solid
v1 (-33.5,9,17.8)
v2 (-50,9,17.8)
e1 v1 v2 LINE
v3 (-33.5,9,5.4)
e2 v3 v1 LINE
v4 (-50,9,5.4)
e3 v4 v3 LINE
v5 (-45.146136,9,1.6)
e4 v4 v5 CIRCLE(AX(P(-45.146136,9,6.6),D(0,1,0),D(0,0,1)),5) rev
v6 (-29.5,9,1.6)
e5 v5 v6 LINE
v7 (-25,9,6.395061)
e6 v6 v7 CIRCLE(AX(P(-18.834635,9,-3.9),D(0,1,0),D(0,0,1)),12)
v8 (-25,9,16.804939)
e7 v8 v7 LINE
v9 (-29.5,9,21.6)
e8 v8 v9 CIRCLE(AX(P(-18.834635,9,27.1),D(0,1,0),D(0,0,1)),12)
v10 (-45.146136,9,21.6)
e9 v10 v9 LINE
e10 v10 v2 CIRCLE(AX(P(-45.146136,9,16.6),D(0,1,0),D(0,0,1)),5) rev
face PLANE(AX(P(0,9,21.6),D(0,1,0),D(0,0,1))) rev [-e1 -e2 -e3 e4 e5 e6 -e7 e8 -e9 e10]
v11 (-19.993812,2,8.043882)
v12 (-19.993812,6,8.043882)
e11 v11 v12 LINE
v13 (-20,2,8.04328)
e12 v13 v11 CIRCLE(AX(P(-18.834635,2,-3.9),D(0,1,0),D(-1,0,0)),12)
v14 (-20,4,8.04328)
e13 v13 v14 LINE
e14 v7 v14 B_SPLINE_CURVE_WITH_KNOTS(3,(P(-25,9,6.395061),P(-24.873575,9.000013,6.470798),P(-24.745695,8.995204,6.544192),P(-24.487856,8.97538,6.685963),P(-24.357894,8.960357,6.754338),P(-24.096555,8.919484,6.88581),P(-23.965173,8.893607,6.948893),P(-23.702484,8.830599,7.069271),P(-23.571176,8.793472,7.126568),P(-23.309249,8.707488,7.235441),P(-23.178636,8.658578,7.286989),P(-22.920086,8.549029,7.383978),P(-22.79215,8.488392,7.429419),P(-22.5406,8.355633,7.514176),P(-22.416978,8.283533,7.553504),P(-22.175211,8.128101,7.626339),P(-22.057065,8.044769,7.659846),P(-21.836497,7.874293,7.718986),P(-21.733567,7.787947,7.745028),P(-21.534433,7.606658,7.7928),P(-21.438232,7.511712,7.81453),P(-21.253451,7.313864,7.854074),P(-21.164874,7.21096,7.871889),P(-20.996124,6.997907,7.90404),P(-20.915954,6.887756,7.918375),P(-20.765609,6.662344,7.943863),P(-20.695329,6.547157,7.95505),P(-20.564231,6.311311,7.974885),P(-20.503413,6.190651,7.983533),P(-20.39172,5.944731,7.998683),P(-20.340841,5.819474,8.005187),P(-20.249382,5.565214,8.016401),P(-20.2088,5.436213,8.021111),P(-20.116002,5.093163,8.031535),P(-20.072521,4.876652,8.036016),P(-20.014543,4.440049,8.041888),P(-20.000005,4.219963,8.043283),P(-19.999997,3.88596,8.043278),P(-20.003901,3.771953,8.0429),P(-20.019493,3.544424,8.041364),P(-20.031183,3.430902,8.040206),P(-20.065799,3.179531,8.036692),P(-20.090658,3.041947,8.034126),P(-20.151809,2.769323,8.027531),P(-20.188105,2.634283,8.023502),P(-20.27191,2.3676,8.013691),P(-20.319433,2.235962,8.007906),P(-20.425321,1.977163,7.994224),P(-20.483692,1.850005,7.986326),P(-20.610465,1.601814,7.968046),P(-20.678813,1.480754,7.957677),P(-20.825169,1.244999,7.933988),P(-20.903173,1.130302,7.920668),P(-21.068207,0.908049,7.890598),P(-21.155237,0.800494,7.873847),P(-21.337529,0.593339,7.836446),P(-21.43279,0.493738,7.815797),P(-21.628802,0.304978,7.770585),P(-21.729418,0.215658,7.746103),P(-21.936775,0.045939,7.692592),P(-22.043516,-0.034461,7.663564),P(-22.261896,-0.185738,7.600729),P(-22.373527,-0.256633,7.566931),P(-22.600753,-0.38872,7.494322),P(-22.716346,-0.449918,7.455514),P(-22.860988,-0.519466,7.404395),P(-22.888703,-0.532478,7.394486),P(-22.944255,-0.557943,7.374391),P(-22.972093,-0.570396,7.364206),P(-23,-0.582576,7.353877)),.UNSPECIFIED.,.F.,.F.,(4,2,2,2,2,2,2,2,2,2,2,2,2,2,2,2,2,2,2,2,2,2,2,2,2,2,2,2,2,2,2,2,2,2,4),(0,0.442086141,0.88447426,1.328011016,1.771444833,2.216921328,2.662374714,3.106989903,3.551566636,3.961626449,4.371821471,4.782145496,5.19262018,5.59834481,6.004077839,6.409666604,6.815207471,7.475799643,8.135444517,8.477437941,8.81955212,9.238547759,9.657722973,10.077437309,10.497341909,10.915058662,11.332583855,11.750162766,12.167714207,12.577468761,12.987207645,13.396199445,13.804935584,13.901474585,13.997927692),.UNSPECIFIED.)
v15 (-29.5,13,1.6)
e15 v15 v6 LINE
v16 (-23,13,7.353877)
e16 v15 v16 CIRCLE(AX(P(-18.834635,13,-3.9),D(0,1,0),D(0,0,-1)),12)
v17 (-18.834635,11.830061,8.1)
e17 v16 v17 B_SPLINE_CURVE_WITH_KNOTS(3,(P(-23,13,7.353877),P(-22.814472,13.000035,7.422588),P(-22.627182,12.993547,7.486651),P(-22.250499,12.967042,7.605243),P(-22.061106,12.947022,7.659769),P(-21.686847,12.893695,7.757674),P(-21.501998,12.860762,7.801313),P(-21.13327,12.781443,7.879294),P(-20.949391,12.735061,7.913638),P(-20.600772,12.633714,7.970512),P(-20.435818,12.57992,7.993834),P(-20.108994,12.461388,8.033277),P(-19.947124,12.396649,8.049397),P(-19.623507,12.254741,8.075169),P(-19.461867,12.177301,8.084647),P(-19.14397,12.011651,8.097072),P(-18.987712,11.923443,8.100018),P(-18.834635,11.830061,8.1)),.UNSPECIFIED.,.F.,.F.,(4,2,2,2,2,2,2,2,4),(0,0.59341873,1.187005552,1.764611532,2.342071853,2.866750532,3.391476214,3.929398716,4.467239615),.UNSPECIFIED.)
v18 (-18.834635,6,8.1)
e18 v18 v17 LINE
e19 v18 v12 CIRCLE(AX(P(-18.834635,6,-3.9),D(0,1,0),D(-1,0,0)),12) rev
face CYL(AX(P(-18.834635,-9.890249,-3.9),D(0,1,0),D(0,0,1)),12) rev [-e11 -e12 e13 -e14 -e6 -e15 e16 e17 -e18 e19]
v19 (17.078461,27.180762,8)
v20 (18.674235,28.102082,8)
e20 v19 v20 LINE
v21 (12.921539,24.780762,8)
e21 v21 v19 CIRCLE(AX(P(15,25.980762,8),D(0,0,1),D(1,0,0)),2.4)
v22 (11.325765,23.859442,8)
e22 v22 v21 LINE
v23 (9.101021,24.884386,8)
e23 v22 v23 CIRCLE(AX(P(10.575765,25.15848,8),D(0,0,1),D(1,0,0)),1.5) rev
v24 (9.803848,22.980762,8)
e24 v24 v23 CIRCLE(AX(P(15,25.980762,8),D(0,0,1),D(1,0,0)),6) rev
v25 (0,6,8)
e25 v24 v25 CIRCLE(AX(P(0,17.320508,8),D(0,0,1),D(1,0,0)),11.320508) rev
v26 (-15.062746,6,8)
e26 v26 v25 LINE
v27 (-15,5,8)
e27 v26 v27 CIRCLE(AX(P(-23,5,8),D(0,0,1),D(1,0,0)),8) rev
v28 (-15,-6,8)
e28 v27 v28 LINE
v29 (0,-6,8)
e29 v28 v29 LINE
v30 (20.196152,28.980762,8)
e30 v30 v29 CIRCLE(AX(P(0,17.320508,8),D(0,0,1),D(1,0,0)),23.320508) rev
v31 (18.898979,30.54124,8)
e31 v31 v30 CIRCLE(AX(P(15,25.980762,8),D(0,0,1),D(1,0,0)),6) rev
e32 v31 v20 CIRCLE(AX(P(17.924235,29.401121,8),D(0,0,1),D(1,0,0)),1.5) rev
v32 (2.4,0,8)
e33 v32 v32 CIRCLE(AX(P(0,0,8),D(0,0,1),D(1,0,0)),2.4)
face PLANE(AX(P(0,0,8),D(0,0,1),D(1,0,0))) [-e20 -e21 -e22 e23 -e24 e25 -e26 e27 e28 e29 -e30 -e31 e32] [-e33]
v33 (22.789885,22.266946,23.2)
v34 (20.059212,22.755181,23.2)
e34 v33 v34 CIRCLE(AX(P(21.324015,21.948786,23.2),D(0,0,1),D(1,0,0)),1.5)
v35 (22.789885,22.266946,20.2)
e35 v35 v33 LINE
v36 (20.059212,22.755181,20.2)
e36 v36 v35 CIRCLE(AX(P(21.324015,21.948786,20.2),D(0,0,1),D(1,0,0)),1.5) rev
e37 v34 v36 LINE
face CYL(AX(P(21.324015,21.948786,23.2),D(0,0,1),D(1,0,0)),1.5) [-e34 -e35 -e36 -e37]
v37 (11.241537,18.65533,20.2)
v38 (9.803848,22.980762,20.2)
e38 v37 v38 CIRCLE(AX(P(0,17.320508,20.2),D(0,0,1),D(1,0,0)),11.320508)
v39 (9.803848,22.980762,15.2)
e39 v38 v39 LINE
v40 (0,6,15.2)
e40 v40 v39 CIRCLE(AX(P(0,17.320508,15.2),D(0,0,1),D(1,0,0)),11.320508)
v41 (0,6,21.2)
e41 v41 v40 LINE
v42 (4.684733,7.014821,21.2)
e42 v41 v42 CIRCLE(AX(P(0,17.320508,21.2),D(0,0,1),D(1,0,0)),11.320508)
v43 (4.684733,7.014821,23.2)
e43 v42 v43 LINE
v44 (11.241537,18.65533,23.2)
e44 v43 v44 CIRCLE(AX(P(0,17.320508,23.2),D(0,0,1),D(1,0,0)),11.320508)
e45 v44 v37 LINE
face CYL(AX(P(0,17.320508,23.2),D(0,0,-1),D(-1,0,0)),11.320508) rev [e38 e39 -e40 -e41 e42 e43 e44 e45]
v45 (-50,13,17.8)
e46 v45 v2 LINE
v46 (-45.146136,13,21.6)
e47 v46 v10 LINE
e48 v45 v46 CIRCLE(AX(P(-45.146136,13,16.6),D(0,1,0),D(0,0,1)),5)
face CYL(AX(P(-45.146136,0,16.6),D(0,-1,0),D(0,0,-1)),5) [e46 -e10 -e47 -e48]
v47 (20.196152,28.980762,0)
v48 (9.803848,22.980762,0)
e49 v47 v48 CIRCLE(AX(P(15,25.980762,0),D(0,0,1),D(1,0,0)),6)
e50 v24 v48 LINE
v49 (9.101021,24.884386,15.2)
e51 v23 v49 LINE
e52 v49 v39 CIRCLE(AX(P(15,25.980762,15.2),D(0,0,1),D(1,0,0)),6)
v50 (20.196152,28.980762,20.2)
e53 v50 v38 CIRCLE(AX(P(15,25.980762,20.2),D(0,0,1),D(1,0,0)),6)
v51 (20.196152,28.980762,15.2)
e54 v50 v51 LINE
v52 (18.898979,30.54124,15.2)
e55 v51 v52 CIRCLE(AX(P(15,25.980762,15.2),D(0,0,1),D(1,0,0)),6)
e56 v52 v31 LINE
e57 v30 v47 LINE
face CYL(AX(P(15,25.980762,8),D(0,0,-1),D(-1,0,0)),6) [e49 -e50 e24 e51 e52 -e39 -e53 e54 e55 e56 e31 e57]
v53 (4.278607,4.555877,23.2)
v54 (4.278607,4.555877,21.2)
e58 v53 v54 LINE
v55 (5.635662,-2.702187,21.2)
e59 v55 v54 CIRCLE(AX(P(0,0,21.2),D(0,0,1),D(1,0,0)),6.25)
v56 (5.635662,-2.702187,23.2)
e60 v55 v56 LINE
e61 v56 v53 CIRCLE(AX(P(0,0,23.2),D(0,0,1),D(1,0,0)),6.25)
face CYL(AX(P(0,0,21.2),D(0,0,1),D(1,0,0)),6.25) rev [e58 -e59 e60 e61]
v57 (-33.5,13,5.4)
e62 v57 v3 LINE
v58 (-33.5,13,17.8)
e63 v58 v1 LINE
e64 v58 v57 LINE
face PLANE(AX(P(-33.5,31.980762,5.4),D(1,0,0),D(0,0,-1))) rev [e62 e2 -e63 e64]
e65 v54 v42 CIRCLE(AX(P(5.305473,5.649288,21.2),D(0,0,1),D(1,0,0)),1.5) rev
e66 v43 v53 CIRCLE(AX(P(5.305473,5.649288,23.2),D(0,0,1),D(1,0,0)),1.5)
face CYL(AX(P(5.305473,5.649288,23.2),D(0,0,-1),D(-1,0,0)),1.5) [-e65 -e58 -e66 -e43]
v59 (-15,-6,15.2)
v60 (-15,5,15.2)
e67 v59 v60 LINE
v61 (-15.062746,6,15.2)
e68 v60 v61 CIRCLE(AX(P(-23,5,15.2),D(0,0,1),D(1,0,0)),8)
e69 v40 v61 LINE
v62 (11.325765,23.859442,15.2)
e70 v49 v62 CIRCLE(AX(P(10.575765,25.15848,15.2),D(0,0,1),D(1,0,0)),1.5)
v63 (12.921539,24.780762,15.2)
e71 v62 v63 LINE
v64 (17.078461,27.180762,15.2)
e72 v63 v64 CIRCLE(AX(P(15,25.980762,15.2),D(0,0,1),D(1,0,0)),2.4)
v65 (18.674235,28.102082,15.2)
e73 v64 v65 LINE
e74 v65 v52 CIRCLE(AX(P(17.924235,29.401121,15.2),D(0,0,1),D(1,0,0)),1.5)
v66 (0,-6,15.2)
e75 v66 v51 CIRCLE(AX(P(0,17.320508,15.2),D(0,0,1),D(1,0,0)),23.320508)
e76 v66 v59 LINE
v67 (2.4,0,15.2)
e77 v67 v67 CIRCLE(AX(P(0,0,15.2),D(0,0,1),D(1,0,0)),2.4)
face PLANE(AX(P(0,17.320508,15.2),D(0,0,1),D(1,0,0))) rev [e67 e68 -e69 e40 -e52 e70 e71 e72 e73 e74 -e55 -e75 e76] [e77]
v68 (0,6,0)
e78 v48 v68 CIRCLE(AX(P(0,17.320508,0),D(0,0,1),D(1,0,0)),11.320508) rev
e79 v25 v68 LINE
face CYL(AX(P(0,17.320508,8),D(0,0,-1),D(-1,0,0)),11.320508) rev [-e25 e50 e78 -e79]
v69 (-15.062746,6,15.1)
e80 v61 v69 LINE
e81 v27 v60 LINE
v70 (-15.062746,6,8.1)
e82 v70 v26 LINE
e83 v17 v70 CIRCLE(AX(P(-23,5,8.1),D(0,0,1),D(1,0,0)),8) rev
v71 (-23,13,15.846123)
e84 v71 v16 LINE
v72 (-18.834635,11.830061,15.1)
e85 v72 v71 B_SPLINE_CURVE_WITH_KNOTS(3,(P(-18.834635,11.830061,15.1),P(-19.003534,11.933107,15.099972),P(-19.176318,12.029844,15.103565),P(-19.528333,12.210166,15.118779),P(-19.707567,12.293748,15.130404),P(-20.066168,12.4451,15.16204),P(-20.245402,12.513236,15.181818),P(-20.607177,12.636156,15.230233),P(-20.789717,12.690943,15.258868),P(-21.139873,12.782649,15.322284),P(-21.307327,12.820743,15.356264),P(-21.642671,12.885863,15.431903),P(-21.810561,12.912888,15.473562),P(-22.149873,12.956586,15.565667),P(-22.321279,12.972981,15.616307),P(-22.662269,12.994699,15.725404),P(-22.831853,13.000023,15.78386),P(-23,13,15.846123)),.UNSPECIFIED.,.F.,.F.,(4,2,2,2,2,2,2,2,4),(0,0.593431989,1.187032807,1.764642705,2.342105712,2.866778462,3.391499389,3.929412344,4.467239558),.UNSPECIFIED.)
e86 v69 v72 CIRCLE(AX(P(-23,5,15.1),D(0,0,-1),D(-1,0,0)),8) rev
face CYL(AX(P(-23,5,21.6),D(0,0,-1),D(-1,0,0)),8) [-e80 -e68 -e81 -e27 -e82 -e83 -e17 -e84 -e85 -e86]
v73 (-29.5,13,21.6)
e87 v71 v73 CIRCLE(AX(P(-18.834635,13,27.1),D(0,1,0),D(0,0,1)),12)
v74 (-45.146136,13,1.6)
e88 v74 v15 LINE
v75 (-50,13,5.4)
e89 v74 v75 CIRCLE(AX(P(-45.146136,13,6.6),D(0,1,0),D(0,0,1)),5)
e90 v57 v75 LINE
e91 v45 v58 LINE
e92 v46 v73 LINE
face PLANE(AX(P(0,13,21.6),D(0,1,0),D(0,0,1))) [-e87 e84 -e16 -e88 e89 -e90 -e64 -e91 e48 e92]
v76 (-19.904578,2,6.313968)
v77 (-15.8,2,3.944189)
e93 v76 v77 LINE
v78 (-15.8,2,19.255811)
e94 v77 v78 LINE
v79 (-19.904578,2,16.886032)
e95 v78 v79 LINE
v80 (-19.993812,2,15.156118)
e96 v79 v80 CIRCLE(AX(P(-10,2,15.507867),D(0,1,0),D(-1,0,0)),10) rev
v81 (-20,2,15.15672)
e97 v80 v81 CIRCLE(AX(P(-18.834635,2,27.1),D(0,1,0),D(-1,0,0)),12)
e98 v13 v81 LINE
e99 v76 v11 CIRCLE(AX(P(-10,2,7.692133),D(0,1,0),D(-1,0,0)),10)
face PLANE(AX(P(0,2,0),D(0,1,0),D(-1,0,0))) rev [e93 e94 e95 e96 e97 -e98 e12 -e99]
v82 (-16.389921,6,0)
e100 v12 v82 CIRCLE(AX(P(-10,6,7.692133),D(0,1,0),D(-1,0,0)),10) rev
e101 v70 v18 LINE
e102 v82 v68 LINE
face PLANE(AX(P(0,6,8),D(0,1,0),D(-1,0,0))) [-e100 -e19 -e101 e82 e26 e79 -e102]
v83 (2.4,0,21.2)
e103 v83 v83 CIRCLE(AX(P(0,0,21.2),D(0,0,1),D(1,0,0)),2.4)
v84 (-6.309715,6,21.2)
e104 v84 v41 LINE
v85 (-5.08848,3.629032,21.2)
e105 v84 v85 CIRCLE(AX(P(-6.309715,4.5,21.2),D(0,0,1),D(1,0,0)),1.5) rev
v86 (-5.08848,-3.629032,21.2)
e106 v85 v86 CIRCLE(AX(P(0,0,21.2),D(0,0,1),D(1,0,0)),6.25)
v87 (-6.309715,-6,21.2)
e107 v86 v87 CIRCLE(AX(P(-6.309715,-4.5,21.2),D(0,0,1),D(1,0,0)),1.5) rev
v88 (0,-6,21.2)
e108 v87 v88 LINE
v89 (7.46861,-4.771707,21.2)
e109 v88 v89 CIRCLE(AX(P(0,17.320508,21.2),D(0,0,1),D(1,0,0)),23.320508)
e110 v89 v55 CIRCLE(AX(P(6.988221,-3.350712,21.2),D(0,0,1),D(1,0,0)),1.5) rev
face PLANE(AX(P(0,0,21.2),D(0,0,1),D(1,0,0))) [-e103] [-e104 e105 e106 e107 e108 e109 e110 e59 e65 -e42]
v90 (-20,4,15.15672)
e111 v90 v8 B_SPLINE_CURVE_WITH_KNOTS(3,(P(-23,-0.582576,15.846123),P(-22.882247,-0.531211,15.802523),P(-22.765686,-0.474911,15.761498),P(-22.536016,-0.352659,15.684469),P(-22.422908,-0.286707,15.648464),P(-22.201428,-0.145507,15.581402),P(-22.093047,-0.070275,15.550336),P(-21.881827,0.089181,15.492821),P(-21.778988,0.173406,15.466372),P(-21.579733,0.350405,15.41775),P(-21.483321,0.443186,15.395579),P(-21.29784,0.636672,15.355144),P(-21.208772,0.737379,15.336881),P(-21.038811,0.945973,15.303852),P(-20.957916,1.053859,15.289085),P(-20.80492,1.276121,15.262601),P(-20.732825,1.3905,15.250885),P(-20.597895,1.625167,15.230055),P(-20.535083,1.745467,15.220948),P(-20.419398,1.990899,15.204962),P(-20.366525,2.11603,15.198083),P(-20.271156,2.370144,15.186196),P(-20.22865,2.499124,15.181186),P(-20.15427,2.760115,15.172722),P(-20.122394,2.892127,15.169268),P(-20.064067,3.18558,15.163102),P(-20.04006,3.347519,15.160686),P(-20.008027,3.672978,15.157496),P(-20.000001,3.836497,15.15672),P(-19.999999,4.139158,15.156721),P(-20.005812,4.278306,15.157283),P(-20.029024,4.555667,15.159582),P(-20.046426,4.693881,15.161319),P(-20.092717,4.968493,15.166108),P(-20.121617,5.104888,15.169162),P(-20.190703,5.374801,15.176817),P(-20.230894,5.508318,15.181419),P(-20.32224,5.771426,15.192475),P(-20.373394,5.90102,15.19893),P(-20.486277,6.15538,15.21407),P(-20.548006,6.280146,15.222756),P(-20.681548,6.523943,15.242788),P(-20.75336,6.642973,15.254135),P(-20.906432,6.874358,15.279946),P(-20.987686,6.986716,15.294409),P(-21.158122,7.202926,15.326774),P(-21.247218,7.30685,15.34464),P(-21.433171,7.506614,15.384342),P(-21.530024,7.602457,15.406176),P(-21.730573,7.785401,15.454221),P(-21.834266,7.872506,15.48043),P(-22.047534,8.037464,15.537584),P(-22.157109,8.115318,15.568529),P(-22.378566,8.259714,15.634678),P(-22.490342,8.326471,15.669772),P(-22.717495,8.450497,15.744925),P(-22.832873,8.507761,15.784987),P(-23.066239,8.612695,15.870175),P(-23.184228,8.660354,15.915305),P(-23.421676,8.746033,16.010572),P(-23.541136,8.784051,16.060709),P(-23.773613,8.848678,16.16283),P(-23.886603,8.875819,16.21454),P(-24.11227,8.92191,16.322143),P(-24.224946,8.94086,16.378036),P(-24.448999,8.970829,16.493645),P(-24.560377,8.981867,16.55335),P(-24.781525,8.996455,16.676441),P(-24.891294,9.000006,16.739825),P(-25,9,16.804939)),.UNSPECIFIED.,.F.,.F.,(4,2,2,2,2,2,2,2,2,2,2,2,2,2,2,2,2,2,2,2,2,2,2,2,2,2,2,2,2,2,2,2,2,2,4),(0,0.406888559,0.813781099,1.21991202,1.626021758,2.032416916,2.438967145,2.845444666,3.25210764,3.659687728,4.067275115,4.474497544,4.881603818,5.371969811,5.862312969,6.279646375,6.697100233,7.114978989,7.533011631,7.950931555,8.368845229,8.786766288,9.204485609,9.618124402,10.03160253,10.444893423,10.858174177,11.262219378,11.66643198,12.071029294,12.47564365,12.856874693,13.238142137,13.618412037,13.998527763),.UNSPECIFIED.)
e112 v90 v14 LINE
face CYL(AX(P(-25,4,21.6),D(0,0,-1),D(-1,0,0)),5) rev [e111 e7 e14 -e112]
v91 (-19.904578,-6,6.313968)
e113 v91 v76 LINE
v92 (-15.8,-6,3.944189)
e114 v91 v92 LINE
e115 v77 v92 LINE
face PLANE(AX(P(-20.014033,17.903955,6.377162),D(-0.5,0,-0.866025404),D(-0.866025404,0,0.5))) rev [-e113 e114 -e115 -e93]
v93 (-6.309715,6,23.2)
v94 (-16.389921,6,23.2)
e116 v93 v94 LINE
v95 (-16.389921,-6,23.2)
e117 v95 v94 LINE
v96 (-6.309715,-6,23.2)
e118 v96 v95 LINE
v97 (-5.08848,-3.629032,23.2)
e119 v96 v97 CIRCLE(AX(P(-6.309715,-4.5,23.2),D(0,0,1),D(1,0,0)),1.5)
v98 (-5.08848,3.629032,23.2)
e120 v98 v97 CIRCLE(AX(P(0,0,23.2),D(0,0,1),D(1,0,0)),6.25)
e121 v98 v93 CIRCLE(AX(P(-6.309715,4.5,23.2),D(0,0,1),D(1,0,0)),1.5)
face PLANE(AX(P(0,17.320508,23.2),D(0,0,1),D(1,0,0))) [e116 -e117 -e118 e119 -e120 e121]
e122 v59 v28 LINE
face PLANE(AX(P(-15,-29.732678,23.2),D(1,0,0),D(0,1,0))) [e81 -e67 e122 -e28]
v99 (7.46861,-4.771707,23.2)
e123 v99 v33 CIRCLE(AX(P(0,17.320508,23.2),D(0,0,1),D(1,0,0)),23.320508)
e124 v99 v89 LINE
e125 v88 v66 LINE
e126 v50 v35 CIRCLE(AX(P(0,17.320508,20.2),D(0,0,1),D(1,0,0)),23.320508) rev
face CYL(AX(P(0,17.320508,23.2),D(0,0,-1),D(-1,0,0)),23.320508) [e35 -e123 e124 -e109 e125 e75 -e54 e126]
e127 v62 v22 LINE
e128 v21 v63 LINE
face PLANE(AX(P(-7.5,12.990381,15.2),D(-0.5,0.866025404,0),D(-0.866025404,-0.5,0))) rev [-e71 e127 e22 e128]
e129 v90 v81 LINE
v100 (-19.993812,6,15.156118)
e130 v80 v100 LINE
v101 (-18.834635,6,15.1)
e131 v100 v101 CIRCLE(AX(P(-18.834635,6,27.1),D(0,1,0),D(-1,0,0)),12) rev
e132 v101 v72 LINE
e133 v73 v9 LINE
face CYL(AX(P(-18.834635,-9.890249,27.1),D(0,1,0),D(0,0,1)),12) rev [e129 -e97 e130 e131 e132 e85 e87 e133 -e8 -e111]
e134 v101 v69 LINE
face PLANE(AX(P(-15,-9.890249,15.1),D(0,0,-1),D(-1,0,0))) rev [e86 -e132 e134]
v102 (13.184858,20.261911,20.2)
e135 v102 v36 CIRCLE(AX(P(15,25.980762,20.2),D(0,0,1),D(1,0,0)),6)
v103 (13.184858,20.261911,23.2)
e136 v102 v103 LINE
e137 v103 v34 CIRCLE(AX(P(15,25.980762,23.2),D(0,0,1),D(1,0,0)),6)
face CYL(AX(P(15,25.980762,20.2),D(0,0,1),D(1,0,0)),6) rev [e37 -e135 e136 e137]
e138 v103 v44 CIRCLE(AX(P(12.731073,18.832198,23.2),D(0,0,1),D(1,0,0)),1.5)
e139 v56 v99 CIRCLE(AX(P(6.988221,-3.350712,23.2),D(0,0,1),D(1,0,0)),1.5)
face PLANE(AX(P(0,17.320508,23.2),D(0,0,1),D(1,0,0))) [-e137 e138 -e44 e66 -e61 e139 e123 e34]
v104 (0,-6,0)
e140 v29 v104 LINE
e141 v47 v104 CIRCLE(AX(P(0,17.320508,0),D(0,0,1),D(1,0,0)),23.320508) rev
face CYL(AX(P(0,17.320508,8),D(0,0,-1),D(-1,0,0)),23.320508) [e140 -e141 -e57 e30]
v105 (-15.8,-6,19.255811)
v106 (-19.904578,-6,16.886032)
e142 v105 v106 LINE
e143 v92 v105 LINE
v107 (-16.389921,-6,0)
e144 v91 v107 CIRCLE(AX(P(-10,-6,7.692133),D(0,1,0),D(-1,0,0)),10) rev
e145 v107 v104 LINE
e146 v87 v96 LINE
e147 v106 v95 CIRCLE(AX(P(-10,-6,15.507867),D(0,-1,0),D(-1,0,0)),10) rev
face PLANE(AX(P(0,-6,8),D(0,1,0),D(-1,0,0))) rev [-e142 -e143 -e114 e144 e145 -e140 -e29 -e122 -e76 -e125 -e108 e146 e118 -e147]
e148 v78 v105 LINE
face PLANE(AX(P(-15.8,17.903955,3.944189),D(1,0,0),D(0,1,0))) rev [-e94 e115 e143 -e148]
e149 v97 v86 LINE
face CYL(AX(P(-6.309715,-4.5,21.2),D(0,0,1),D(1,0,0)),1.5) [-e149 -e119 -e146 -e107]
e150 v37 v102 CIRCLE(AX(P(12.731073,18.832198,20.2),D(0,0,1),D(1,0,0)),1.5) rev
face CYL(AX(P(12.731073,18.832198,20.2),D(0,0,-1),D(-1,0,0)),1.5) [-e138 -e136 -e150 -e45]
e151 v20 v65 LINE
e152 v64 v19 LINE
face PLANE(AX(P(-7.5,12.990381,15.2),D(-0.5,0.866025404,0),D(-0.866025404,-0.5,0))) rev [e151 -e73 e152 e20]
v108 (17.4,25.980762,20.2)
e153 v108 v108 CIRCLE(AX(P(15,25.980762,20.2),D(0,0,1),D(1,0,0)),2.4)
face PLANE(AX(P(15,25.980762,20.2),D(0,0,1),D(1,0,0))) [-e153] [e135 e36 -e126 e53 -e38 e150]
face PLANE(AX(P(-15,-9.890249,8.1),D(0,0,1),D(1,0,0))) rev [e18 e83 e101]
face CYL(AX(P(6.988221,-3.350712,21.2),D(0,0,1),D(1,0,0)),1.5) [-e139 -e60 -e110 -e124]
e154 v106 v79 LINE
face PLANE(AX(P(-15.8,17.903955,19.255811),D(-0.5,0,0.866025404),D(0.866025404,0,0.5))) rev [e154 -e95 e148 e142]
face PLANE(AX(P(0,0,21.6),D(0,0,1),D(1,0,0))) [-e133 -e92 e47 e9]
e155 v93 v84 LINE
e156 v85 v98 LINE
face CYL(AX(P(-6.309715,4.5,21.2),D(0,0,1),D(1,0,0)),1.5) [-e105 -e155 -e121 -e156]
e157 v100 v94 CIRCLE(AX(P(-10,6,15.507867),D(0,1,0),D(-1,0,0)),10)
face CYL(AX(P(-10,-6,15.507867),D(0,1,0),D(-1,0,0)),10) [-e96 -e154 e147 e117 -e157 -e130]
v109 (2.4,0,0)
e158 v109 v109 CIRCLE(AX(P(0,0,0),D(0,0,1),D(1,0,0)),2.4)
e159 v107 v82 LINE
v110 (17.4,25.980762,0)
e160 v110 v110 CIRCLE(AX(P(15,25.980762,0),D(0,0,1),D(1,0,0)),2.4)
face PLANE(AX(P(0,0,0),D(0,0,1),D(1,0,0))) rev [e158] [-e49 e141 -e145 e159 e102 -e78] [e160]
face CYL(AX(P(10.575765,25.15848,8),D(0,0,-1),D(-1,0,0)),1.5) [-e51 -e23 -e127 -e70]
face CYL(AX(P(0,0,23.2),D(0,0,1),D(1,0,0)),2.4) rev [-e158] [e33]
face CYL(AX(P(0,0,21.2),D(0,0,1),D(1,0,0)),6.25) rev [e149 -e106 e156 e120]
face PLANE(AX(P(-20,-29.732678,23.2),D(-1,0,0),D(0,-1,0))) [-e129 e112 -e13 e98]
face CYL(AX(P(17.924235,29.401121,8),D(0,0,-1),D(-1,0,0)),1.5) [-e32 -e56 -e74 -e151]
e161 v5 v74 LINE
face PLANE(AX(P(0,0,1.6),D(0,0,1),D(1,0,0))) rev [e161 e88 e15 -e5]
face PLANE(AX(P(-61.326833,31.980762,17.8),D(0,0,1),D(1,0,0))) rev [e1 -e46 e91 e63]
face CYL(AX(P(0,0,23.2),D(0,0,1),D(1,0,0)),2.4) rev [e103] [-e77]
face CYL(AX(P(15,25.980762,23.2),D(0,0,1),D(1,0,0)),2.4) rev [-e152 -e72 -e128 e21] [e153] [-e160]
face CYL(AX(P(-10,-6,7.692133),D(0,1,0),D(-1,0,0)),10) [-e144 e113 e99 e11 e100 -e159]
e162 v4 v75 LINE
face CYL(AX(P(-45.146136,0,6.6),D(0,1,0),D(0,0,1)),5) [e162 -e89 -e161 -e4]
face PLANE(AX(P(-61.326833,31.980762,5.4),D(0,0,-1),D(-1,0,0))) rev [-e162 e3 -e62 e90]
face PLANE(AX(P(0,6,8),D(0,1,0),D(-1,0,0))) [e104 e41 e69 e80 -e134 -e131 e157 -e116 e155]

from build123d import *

# Parameters (mm, degrees)
BOSS_EXTRUDE1_DEPTH      = 8
BOSS_EXTRUDE2_DEPTH      = 7.2
BOSS_EXTRUDE3_START      = 15.2
SKETCH1_3_R              = 6
BOSS_EXTRUDE3_DEPTH      = 8
SKETCH3_W                = 5
SKETCH3_H                = 23.2
BOSS_EXTRUDE4_DEPTH      = 12
CUT_EXTRUDE1_START       = -3
SKETCH4_R                = 6
CUT_EXTRUDE1_DEPTH       = 3
FILLET1_START            = 20.2
FILLET1_DEPTH            = 3.8
FILLET1_START_2          = 8
FILLET1_2_DEPTH          = 7.2
SKETCH7_R                = 6.25
CUT_EXTRUDE4_DEPTH       = 2
FILLET2_R                = 1.5
M4_CLEARANCE_HOLE1_D     = 4.8
CUT_EXTRUDE5_DEPTH       = 42.917610932
CUT_EXTRUDE6_START       = -12
CUT_EXTRUDE6_DEPTH       = 8
CUT_EXTRUDE7_DEPTH       = 8
BOSS_EXTRUDE5_DEPTH      = 10
CUT_EXTRUDE9_DEPTH       = 60.718970453
CUT_EXTRUDE9_DEPTH_BACK  = 60.718970453
SKETCH17_W               = 27.826832925
SKETCH17_H               = 12.4
FILLET3_R                = 5
CUT_EXTRUDE10_REACH      = 60.303
CUT_EXTRUDE11_START      = -8
CUT_EXTRUDE11_DEPTH      = 8
FILLET6_R                = 8
CUT_EXTRUDE12_DEPTH      = 61.936360284
CUT_EXTRUDE12_DEPTH_BACK = 61.936360284


with BuildPart() as part:
    # Sketch1 → Boss-Extrude1 (new body)
    with BuildSketch(Plane.XY):
        with BuildLine():
            ThreePointArc((0, -6), (20.196152423, 5.660254038), (20.196152423, 28.980762114))
            ThreePointArc((20.196152423, 28.980762114), (12, 31.176914536), (9.803847577, 22.980762114))
            ThreePointArc((9.803847577, 22.980762114), (9.803847577, 11.660254038), (0, 6))
            Line((0, 6), (-15, 6))
            Line((-15, 6), (-15, -6))
            Line((-15, -6), (0, -6))
        make_face()
    extrude(amount=BOSS_EXTRUDE1_DEPTH)

    # Sketch2 → Boss-Extrude2 (add)
    with BuildSketch(Plane.XY.offset(8)):
        with BuildLine():
            Line((9.803847577, 22.980762114), (20.196152423, 28.980762114))
            ThreePointArc((20.196152423, 28.980762114), (12, 31.176914536), (9.803847577, 22.980762114))
        make_face()
    extrude(amount=BOSS_EXTRUDE2_DEPTH)

    # Sketch1<3> → Boss-Extrude3 (add)
    with BuildSketch(Plane.XY.offset(BOSS_EXTRUDE3_START)):
        with Locations((15, 25.980762114)):
            Circle(SKETCH1_3_R)
        with BuildLine():
            ThreePointArc((9.803847577, 22.980762114), (9.803847577, 11.660254038), (0, 6))
            ThreePointArc((0, 6), (4.242640687, 4.242640687), (6, 0))
            ThreePointArc((6, 0), (4.242640687, -4.242640687), (0, -6))
            ThreePointArc((0, -6), (20.196152423, 5.660254038), (20.196152423, 28.980762114))
            ThreePointArc((20.196152423, 28.980762114), (20.795554958, 27.533676384), (21, 25.980762114))
            ThreePointArc((21, 25.980762114), (16.552914271, 20.185207156), (9.803847577, 22.980762114))
        make_face()
        Circle(SKETCH1_3_R)
        with BuildLine():
            Line((0, 6), (-15, 6))
            Line((-15, 6), (-15, -6))
            Line((-15, -6), (0, -6))
            ThreePointArc((0, -6), (-6, 0), (0, 6))
        make_face()
    extrude(amount=BOSS_EXTRUDE3_DEPTH)

    # Sketch3 → Boss-Extrude4 (add)
    with BuildSketch(Plane(origin=(0, 6, 0), x_dir=(1, 0, 0), z_dir=(0, 1, 0))):
        with Locations((-17.5, -11.6)):
            Rectangle(SKETCH3_W, SKETCH3_H)
    extrude(amount=-BOSS_EXTRUDE4_DEPTH)

    # Sketch4 → Cut-Extrude1 (cut)
    with BuildSketch(Plane.XY.offset(23.2).offset(CUT_EXTRUDE1_START)):
        with Locations((15, 25.980762114)):
            Circle(SKETCH4_R)
    extrude(amount=CUT_EXTRUDE1_DEPTH, mode=Mode.SUBTRACT)

    # Fillet1: read off the stored shape, not the designer's step
    # Fillet1 outline → Fillet1 (cut)
    with BuildSketch(Plane.XY.offset(FILLET1_START)):
        with BuildLine():
            ThreePointArc((22.78988481, 22.266945911), (21.753590077, 25.724519955), (20.196152423, 28.980762114))
            ThreePointArc((20.196152423, 28.980762114), (20.998549002, 25.848815632), (20.059212052, 22.755181017))
            ThreePointArc((20.059212052, 22.755181017), (21.58802328, 23.425369524), (22.78988481, 22.266945911))
        make_face()
        with BuildLine():
            ThreePointArc((13.184858447, 20.261910731), (11.240000131, 21.305037466), (9.803847577, 22.980762114))
            ThreePointArc((9.803847577, 22.980762114), (10.742643673, 20.891153677), (11.24153696, 18.655330111))
            ThreePointArc((11.24153696, 18.655330111), (11.775316706, 19.988281703), (13.184858447, 20.261910731))
        make_face()
    extrude(amount=FILLET1_DEPTH, mode=Mode.SUBTRACT)

    # Fillet1 2 outline → Fillet1 2 (cut)
    with BuildSketch(Plane.XY.offset(FILLET1_START_2)):
        with BuildLine():
            ThreePointArc((20.196152423, 28.980762114), (19.614014408, 29.816237449), (18.898979486, 30.541240046))
            ThreePointArc((18.898979486, 30.541240046), (19.417907488, 29.263492998), (18.674234614, 28.102082457))
            Line((18.674234614, 28.102082457), (20.196152423, 28.980762114))
        make_face()
        with BuildLine():
            ThreePointArc((11.325765386, 23.85944177), (9.948117916, 23.79610744), (9.101020514, 24.884385796))
            ThreePointArc((9.101020514, 24.884385796), (9.37137372, 23.902646091), (9.803847577, 22.980762114))
            Line((9.803847577, 22.980762114), (11.325765386, 23.85944177))
        make_face()
    extrude(amount=FILLET1_2_DEPTH, mode=Mode.SUBTRACT)

    # Sketch7 → Cut-Extrude4 (cut)
    with BuildSketch(Plane.XY.offset(23.2)):
        Circle(SKETCH7_R)
    extrude(amount=-CUT_EXTRUDE4_DEPTH, mode=Mode.SUBTRACT)

    # Fillet2
    fillet2_edges = [part.edges().sort_by_distance(p)[0] for p in [
        (-1.75, 6, 22.2),
        (1.412020937, 6.08840676, 22.2),
        (-1.75, -6, 22.2),
        (2.028685625, -5.91159324, 22.2),
    ]]
    fillet(fillet2_edges, radius=FILLET2_R)

    # M4 Clearance Hole1 (through all)
    with Locations(Plane.XY.offset(23.2)):
        with Locations((0, 0), (15, 25.980762114)):
            Hole(M4_CLEARANCE_HOLE1_D / 2)

    # Sketch8 → Cut-Extrude5 (cut, symmetric)
    with BuildSketch(Plane(origin=(0, 6, 0), x_dir=(1, 0, 0), z_dir=(0, 1, 0))):
        with BuildLine():
            Line((-16.389921041, 0), (-20, 0))
            Line((-20, 0), (-20, -7.692132935))
            ThreePointArc((-20, -7.692132935), (-19.052602124, -3.443557315), (-16.389921041, 0))
        make_face()
    cut_extrude5 = extrude(amount=CUT_EXTRUDE5_DEPTH, both=True, mode=Mode.SUBTRACT)

    # Mirror1: Cut-Extrude5 across plane
    add(cut_extrude5.mirror(Plane.XY.offset(11.6)), mode=Mode.SUBTRACT)

    # Sketch12 → Cut-Extrude6 (cut)
    with BuildSketch(Plane(origin=(0, 6, 0), x_dir=(1, 0, 0), z_dir=(0, 1, 0)).offset(CUT_EXTRUDE6_START)):
        Polygon((-20, -6.6), (-20, -16.6), (-16, -18.909401077), (-16, -4.290598923), align=None)
    extrude(amount=CUT_EXTRUDE6_DEPTH, mode=Mode.SUBTRACT)

    # Sketch13 → Cut-Extrude7 (cut)
    with BuildSketch(Plane.XZ.offset(6)):
        Polygon((-16, 4.290598923), (-19.936057883, 6.563083001), (-19.986057883, 6.476480461), (-15.9, 4.117393842), (-15.9, 19.082606158), (-19.986057883, 16.723519539), (-19.936057883, 16.636916999), (-16, 18.909401077), align=None)
    extrude(amount=-CUT_EXTRUDE7_DEPTH, mode=Mode.SUBTRACT)

    # Sketch14 → Boss-Extrude5 (add, symmetric)
    with BuildSketch(Plane.XY.offset(11.6)):
        with BuildLine():
            Line((-15, 6), (-15, 13))
            Line((-15, 13), (-50, 13))
            Line((-50, 13), (-50, 9))
            Line((-50, 9), (-25, 9))
            ThreePointArc((-25, 9), (-21.464466094, 7.535533906), (-20, 4))
            Line((-20, 4), (-20, 6))
            Line((-20, 6), (-15, 6))
        make_face()
    extrude(amount=BOSS_EXTRUDE5_DEPTH, both=True)

    # Sketch17 → Cut-Extrude9 (cut, two sides: drawn at the far end of the back side and taken through both)
    with BuildSketch(Plane.XZ.offset(-9).offset(-CUT_EXTRUDE9_DEPTH_BACK)):
        with Locations((-47.413416463, 11.6)):
            Rectangle(SKETCH17_W, SKETCH17_H)
    extrude(amount=CUT_EXTRUDE9_DEPTH + CUT_EXTRUDE9_DEPTH_BACK, mode=Mode.SUBTRACT)

    # Fillet3
    # the kernel refuses this fillet: 5 mm, written as the material it takes off along each edge
    with BuildSketch(Plane(origin=(-50, 25.1346611, 21.6), x_dir=(1, 0, 0), z_dir=(0, -1, 0))) as fillet3_piece_1:
        with BuildLine():
            CenterArc((4.85386444, -5), FILLET3_R, 90, 76.113459637)
            Line((0, -3.8), (-0.097077289, -3.776))
            ThreePointArc((-0.097077289, -3.776), (-0.1, -1.9), (-0.1, 0))
            Line((-0.1, 0), (0, 0.1))
            Line((0, 0.1), (4.85386444, 0.1))
            Line((4.85386444, 0.1), (4.85386444, 0))
        make_face()
    extrude(amount=28.269322199, mode=Mode.SUBTRACT)
    with BuildSketch(Plane(origin=(-50, 25.1346611, 1.6), x_dir=(1, 0, 0), z_dir=(0, -1, 0))) as fillet3_piece_2:
        with BuildLine():
            CenterArc((4.85386444, 5), FILLET3_R, 193.886540363, 76.113459637)
            Line((0, 3.8), (-0.097077289, 3.776))
            ThreePointArc((-0.097077289, 3.776), (-0.1, 1.9), (-0.1, 0))
            Line((-0.1, 0), (0, -0.1))
            Line((0, -0.1), (4.85386444, -0.1))
            Line((4.85386444, -0.1), (4.85386444, 0))
        make_face()
    extrude(amount=28.269322199, mode=Mode.SUBTRACT)

    # Cut-Extrude10: up to this face of the body (flat: up to its plane)
    cut_extrude10_end = Plane(part.part.faces().sort_by_distance((-8.271042779, 6, 18.958105224))[0])
    # Sketch18 → Cut-Extrude10 (cut, up to the picked face)
    with BuildSketch(Plane(origin=(0, 13, 0), x_dir=(1, 0, 0), z_dir=(0, 1, 0)), mode=Mode.PRIVATE) as cut_extrude10_sk1:
        with BuildLine():
            Line((-15, -8.1), (-18.834635496, -8.1))
            ThreePointArc((-18.834635496, -8.1), (-25.079633495, -6.346950766), (-29.5, -1.6))
            Line((-29.5, -1.6), (-15, -1.6))
            Line((-15, -1.6), (-15, -8.1))
        make_face()
    cut_extrude10_tool1 = split(extrude(cut_extrude10_sk1.sketch, amount=-CUT_EXTRUDE10_REACH, mode=Mode.PRIVATE), bisect_by=cut_extrude10_end, keep=Keep.BOTH, mode=Mode.PRIVATE)
    # Sketch18 → Cut-Extrude10 (cut, up to the picked face)
    with BuildSketch(Plane(origin=(0, 13, 0), x_dir=(1, 0, 0), z_dir=(0, 1, 0)), mode=Mode.PRIVATE) as cut_extrude10_sk2:
        with BuildLine():
            Line((-15, -15.1), (-18.834635496, -15.1))
            ThreePointArc((-18.834635496, -15.1), (-25.079633495, -16.853049234), (-29.5, -21.6))
            Line((-29.5, -21.6), (-15, -21.6))
            Line((-15, -21.6), (-15, -15.1))
        make_face()
    cut_extrude10_tool2 = split(extrude(cut_extrude10_sk2.sketch, amount=-CUT_EXTRUDE10_REACH, mode=Mode.PRIVATE), bisect_by=cut_extrude10_end, keep=Keep.BOTH, mode=Mode.PRIVATE)
    add(cut_extrude10_tool1.solids().sort_by(Axis((-20.984013, 13, 4.465435), (0, -1, 0)))[0], mode=Mode.SUBTRACT)
    add(cut_extrude10_tool2.solids().sort_by(Axis((-20.984013, 13, 18.734565), (0, -1, 0)))[0], mode=Mode.SUBTRACT)

    # Sketch19 → Cut-Extrude11 (cut)
    with BuildSketch(Plane.XZ.offset(6).offset(CUT_EXTRUDE11_START)):
        with BuildLine():
            Line((-20.014032682, 6.377161665), (-15.8, 3.944188762))
            Line((-15.8, 3.944188762), (-15.8, 19.255811238))
            Line((-15.8, 19.255811238), (-20.014032682, 16.822838335))
            ThreePointArc((-20.014032682, 16.822838335), (-20.078485255, 16.166756248), (-20.1, 15.507867065))
            Line((-20.1, 15.507867065), (-20.1, 7.692132935))
            ThreePointArc((-20.1, 7.692132935), (-20.078485255, 7.033243752), (-20.014032682, 6.377161665))
        make_face()
        with BuildLine():
            Line((-19.921174748, 6.439020166), (-15.9, 4.117393842))
            Line((-15.9, 4.117393842), (-15.9, 19.082606158))
            Line((-15.9, 19.082606158), (-19.921174748, 16.760979834))
            ThreePointArc((-19.921174748, 16.760979834), (-19.980274232, 16.135661823), (-20, 15.507867065))
            Line((-20, 15.507867065), (-20, 7.692132935))
            ThreePointArc((-20, 7.692132935), (-19.980274232, 7.064338177), (-19.921174748, 6.439020166))
        make_face(mode=Mode.SUBTRACT)
    extrude(amount=CUT_EXTRUDE11_DEPTH, mode=Mode.SUBTRACT)

    # Fillet6
    fillet6_edges = [part.edges().sort_by_distance(p)[0] for p in [
        (-15, 13, 11.6),
    ]]
    fillet(fillet6_edges, radius=FILLET6_R)

    # Sketch20 → Cut-Extrude12 (cut, two sides: drawn at the far end of the back side and taken through both)
    with BuildSketch(Plane(origin=(0, 6, 0), x_dir=(1, 0, 0), z_dir=(0, 1, 0)).offset(-CUT_EXTRUDE12_DEPTH_BACK)):
        with BuildLine():
            Line((-16.389921041, 0), (-23, 0))
            Line((-23, 0), (-23, -7.353876601))
            ThreePointArc((-23, -7.353876601), (-21.519167163, -7.795866352), (-19.993811725, -8.043881717))
            ThreePointArc((-19.993811725, -8.043881717), (-19.125934643, -3.603451376), (-16.389921041, 0))
        make_face()
        with BuildLine():
            Line((-23, -23.2), (-23, -15.846123399))
            ThreePointArc((-23, -15.846123399), (-21.519167163, -15.404133648), (-19.993811725, -15.156118283))
            ThreePointArc((-19.993811725, -15.156118283), (-19.125934643, -19.596548624), (-16.389921041, -23.2))
            Line((-16.389921041, -23.2), (-23, -23.2))
        make_face()
    extrude(amount=CUT_EXTRUDE12_DEPTH + CUT_EXTRUDE12_DEPTH_BACK, mode=Mode.SUBTRACT)


solid = part.part
